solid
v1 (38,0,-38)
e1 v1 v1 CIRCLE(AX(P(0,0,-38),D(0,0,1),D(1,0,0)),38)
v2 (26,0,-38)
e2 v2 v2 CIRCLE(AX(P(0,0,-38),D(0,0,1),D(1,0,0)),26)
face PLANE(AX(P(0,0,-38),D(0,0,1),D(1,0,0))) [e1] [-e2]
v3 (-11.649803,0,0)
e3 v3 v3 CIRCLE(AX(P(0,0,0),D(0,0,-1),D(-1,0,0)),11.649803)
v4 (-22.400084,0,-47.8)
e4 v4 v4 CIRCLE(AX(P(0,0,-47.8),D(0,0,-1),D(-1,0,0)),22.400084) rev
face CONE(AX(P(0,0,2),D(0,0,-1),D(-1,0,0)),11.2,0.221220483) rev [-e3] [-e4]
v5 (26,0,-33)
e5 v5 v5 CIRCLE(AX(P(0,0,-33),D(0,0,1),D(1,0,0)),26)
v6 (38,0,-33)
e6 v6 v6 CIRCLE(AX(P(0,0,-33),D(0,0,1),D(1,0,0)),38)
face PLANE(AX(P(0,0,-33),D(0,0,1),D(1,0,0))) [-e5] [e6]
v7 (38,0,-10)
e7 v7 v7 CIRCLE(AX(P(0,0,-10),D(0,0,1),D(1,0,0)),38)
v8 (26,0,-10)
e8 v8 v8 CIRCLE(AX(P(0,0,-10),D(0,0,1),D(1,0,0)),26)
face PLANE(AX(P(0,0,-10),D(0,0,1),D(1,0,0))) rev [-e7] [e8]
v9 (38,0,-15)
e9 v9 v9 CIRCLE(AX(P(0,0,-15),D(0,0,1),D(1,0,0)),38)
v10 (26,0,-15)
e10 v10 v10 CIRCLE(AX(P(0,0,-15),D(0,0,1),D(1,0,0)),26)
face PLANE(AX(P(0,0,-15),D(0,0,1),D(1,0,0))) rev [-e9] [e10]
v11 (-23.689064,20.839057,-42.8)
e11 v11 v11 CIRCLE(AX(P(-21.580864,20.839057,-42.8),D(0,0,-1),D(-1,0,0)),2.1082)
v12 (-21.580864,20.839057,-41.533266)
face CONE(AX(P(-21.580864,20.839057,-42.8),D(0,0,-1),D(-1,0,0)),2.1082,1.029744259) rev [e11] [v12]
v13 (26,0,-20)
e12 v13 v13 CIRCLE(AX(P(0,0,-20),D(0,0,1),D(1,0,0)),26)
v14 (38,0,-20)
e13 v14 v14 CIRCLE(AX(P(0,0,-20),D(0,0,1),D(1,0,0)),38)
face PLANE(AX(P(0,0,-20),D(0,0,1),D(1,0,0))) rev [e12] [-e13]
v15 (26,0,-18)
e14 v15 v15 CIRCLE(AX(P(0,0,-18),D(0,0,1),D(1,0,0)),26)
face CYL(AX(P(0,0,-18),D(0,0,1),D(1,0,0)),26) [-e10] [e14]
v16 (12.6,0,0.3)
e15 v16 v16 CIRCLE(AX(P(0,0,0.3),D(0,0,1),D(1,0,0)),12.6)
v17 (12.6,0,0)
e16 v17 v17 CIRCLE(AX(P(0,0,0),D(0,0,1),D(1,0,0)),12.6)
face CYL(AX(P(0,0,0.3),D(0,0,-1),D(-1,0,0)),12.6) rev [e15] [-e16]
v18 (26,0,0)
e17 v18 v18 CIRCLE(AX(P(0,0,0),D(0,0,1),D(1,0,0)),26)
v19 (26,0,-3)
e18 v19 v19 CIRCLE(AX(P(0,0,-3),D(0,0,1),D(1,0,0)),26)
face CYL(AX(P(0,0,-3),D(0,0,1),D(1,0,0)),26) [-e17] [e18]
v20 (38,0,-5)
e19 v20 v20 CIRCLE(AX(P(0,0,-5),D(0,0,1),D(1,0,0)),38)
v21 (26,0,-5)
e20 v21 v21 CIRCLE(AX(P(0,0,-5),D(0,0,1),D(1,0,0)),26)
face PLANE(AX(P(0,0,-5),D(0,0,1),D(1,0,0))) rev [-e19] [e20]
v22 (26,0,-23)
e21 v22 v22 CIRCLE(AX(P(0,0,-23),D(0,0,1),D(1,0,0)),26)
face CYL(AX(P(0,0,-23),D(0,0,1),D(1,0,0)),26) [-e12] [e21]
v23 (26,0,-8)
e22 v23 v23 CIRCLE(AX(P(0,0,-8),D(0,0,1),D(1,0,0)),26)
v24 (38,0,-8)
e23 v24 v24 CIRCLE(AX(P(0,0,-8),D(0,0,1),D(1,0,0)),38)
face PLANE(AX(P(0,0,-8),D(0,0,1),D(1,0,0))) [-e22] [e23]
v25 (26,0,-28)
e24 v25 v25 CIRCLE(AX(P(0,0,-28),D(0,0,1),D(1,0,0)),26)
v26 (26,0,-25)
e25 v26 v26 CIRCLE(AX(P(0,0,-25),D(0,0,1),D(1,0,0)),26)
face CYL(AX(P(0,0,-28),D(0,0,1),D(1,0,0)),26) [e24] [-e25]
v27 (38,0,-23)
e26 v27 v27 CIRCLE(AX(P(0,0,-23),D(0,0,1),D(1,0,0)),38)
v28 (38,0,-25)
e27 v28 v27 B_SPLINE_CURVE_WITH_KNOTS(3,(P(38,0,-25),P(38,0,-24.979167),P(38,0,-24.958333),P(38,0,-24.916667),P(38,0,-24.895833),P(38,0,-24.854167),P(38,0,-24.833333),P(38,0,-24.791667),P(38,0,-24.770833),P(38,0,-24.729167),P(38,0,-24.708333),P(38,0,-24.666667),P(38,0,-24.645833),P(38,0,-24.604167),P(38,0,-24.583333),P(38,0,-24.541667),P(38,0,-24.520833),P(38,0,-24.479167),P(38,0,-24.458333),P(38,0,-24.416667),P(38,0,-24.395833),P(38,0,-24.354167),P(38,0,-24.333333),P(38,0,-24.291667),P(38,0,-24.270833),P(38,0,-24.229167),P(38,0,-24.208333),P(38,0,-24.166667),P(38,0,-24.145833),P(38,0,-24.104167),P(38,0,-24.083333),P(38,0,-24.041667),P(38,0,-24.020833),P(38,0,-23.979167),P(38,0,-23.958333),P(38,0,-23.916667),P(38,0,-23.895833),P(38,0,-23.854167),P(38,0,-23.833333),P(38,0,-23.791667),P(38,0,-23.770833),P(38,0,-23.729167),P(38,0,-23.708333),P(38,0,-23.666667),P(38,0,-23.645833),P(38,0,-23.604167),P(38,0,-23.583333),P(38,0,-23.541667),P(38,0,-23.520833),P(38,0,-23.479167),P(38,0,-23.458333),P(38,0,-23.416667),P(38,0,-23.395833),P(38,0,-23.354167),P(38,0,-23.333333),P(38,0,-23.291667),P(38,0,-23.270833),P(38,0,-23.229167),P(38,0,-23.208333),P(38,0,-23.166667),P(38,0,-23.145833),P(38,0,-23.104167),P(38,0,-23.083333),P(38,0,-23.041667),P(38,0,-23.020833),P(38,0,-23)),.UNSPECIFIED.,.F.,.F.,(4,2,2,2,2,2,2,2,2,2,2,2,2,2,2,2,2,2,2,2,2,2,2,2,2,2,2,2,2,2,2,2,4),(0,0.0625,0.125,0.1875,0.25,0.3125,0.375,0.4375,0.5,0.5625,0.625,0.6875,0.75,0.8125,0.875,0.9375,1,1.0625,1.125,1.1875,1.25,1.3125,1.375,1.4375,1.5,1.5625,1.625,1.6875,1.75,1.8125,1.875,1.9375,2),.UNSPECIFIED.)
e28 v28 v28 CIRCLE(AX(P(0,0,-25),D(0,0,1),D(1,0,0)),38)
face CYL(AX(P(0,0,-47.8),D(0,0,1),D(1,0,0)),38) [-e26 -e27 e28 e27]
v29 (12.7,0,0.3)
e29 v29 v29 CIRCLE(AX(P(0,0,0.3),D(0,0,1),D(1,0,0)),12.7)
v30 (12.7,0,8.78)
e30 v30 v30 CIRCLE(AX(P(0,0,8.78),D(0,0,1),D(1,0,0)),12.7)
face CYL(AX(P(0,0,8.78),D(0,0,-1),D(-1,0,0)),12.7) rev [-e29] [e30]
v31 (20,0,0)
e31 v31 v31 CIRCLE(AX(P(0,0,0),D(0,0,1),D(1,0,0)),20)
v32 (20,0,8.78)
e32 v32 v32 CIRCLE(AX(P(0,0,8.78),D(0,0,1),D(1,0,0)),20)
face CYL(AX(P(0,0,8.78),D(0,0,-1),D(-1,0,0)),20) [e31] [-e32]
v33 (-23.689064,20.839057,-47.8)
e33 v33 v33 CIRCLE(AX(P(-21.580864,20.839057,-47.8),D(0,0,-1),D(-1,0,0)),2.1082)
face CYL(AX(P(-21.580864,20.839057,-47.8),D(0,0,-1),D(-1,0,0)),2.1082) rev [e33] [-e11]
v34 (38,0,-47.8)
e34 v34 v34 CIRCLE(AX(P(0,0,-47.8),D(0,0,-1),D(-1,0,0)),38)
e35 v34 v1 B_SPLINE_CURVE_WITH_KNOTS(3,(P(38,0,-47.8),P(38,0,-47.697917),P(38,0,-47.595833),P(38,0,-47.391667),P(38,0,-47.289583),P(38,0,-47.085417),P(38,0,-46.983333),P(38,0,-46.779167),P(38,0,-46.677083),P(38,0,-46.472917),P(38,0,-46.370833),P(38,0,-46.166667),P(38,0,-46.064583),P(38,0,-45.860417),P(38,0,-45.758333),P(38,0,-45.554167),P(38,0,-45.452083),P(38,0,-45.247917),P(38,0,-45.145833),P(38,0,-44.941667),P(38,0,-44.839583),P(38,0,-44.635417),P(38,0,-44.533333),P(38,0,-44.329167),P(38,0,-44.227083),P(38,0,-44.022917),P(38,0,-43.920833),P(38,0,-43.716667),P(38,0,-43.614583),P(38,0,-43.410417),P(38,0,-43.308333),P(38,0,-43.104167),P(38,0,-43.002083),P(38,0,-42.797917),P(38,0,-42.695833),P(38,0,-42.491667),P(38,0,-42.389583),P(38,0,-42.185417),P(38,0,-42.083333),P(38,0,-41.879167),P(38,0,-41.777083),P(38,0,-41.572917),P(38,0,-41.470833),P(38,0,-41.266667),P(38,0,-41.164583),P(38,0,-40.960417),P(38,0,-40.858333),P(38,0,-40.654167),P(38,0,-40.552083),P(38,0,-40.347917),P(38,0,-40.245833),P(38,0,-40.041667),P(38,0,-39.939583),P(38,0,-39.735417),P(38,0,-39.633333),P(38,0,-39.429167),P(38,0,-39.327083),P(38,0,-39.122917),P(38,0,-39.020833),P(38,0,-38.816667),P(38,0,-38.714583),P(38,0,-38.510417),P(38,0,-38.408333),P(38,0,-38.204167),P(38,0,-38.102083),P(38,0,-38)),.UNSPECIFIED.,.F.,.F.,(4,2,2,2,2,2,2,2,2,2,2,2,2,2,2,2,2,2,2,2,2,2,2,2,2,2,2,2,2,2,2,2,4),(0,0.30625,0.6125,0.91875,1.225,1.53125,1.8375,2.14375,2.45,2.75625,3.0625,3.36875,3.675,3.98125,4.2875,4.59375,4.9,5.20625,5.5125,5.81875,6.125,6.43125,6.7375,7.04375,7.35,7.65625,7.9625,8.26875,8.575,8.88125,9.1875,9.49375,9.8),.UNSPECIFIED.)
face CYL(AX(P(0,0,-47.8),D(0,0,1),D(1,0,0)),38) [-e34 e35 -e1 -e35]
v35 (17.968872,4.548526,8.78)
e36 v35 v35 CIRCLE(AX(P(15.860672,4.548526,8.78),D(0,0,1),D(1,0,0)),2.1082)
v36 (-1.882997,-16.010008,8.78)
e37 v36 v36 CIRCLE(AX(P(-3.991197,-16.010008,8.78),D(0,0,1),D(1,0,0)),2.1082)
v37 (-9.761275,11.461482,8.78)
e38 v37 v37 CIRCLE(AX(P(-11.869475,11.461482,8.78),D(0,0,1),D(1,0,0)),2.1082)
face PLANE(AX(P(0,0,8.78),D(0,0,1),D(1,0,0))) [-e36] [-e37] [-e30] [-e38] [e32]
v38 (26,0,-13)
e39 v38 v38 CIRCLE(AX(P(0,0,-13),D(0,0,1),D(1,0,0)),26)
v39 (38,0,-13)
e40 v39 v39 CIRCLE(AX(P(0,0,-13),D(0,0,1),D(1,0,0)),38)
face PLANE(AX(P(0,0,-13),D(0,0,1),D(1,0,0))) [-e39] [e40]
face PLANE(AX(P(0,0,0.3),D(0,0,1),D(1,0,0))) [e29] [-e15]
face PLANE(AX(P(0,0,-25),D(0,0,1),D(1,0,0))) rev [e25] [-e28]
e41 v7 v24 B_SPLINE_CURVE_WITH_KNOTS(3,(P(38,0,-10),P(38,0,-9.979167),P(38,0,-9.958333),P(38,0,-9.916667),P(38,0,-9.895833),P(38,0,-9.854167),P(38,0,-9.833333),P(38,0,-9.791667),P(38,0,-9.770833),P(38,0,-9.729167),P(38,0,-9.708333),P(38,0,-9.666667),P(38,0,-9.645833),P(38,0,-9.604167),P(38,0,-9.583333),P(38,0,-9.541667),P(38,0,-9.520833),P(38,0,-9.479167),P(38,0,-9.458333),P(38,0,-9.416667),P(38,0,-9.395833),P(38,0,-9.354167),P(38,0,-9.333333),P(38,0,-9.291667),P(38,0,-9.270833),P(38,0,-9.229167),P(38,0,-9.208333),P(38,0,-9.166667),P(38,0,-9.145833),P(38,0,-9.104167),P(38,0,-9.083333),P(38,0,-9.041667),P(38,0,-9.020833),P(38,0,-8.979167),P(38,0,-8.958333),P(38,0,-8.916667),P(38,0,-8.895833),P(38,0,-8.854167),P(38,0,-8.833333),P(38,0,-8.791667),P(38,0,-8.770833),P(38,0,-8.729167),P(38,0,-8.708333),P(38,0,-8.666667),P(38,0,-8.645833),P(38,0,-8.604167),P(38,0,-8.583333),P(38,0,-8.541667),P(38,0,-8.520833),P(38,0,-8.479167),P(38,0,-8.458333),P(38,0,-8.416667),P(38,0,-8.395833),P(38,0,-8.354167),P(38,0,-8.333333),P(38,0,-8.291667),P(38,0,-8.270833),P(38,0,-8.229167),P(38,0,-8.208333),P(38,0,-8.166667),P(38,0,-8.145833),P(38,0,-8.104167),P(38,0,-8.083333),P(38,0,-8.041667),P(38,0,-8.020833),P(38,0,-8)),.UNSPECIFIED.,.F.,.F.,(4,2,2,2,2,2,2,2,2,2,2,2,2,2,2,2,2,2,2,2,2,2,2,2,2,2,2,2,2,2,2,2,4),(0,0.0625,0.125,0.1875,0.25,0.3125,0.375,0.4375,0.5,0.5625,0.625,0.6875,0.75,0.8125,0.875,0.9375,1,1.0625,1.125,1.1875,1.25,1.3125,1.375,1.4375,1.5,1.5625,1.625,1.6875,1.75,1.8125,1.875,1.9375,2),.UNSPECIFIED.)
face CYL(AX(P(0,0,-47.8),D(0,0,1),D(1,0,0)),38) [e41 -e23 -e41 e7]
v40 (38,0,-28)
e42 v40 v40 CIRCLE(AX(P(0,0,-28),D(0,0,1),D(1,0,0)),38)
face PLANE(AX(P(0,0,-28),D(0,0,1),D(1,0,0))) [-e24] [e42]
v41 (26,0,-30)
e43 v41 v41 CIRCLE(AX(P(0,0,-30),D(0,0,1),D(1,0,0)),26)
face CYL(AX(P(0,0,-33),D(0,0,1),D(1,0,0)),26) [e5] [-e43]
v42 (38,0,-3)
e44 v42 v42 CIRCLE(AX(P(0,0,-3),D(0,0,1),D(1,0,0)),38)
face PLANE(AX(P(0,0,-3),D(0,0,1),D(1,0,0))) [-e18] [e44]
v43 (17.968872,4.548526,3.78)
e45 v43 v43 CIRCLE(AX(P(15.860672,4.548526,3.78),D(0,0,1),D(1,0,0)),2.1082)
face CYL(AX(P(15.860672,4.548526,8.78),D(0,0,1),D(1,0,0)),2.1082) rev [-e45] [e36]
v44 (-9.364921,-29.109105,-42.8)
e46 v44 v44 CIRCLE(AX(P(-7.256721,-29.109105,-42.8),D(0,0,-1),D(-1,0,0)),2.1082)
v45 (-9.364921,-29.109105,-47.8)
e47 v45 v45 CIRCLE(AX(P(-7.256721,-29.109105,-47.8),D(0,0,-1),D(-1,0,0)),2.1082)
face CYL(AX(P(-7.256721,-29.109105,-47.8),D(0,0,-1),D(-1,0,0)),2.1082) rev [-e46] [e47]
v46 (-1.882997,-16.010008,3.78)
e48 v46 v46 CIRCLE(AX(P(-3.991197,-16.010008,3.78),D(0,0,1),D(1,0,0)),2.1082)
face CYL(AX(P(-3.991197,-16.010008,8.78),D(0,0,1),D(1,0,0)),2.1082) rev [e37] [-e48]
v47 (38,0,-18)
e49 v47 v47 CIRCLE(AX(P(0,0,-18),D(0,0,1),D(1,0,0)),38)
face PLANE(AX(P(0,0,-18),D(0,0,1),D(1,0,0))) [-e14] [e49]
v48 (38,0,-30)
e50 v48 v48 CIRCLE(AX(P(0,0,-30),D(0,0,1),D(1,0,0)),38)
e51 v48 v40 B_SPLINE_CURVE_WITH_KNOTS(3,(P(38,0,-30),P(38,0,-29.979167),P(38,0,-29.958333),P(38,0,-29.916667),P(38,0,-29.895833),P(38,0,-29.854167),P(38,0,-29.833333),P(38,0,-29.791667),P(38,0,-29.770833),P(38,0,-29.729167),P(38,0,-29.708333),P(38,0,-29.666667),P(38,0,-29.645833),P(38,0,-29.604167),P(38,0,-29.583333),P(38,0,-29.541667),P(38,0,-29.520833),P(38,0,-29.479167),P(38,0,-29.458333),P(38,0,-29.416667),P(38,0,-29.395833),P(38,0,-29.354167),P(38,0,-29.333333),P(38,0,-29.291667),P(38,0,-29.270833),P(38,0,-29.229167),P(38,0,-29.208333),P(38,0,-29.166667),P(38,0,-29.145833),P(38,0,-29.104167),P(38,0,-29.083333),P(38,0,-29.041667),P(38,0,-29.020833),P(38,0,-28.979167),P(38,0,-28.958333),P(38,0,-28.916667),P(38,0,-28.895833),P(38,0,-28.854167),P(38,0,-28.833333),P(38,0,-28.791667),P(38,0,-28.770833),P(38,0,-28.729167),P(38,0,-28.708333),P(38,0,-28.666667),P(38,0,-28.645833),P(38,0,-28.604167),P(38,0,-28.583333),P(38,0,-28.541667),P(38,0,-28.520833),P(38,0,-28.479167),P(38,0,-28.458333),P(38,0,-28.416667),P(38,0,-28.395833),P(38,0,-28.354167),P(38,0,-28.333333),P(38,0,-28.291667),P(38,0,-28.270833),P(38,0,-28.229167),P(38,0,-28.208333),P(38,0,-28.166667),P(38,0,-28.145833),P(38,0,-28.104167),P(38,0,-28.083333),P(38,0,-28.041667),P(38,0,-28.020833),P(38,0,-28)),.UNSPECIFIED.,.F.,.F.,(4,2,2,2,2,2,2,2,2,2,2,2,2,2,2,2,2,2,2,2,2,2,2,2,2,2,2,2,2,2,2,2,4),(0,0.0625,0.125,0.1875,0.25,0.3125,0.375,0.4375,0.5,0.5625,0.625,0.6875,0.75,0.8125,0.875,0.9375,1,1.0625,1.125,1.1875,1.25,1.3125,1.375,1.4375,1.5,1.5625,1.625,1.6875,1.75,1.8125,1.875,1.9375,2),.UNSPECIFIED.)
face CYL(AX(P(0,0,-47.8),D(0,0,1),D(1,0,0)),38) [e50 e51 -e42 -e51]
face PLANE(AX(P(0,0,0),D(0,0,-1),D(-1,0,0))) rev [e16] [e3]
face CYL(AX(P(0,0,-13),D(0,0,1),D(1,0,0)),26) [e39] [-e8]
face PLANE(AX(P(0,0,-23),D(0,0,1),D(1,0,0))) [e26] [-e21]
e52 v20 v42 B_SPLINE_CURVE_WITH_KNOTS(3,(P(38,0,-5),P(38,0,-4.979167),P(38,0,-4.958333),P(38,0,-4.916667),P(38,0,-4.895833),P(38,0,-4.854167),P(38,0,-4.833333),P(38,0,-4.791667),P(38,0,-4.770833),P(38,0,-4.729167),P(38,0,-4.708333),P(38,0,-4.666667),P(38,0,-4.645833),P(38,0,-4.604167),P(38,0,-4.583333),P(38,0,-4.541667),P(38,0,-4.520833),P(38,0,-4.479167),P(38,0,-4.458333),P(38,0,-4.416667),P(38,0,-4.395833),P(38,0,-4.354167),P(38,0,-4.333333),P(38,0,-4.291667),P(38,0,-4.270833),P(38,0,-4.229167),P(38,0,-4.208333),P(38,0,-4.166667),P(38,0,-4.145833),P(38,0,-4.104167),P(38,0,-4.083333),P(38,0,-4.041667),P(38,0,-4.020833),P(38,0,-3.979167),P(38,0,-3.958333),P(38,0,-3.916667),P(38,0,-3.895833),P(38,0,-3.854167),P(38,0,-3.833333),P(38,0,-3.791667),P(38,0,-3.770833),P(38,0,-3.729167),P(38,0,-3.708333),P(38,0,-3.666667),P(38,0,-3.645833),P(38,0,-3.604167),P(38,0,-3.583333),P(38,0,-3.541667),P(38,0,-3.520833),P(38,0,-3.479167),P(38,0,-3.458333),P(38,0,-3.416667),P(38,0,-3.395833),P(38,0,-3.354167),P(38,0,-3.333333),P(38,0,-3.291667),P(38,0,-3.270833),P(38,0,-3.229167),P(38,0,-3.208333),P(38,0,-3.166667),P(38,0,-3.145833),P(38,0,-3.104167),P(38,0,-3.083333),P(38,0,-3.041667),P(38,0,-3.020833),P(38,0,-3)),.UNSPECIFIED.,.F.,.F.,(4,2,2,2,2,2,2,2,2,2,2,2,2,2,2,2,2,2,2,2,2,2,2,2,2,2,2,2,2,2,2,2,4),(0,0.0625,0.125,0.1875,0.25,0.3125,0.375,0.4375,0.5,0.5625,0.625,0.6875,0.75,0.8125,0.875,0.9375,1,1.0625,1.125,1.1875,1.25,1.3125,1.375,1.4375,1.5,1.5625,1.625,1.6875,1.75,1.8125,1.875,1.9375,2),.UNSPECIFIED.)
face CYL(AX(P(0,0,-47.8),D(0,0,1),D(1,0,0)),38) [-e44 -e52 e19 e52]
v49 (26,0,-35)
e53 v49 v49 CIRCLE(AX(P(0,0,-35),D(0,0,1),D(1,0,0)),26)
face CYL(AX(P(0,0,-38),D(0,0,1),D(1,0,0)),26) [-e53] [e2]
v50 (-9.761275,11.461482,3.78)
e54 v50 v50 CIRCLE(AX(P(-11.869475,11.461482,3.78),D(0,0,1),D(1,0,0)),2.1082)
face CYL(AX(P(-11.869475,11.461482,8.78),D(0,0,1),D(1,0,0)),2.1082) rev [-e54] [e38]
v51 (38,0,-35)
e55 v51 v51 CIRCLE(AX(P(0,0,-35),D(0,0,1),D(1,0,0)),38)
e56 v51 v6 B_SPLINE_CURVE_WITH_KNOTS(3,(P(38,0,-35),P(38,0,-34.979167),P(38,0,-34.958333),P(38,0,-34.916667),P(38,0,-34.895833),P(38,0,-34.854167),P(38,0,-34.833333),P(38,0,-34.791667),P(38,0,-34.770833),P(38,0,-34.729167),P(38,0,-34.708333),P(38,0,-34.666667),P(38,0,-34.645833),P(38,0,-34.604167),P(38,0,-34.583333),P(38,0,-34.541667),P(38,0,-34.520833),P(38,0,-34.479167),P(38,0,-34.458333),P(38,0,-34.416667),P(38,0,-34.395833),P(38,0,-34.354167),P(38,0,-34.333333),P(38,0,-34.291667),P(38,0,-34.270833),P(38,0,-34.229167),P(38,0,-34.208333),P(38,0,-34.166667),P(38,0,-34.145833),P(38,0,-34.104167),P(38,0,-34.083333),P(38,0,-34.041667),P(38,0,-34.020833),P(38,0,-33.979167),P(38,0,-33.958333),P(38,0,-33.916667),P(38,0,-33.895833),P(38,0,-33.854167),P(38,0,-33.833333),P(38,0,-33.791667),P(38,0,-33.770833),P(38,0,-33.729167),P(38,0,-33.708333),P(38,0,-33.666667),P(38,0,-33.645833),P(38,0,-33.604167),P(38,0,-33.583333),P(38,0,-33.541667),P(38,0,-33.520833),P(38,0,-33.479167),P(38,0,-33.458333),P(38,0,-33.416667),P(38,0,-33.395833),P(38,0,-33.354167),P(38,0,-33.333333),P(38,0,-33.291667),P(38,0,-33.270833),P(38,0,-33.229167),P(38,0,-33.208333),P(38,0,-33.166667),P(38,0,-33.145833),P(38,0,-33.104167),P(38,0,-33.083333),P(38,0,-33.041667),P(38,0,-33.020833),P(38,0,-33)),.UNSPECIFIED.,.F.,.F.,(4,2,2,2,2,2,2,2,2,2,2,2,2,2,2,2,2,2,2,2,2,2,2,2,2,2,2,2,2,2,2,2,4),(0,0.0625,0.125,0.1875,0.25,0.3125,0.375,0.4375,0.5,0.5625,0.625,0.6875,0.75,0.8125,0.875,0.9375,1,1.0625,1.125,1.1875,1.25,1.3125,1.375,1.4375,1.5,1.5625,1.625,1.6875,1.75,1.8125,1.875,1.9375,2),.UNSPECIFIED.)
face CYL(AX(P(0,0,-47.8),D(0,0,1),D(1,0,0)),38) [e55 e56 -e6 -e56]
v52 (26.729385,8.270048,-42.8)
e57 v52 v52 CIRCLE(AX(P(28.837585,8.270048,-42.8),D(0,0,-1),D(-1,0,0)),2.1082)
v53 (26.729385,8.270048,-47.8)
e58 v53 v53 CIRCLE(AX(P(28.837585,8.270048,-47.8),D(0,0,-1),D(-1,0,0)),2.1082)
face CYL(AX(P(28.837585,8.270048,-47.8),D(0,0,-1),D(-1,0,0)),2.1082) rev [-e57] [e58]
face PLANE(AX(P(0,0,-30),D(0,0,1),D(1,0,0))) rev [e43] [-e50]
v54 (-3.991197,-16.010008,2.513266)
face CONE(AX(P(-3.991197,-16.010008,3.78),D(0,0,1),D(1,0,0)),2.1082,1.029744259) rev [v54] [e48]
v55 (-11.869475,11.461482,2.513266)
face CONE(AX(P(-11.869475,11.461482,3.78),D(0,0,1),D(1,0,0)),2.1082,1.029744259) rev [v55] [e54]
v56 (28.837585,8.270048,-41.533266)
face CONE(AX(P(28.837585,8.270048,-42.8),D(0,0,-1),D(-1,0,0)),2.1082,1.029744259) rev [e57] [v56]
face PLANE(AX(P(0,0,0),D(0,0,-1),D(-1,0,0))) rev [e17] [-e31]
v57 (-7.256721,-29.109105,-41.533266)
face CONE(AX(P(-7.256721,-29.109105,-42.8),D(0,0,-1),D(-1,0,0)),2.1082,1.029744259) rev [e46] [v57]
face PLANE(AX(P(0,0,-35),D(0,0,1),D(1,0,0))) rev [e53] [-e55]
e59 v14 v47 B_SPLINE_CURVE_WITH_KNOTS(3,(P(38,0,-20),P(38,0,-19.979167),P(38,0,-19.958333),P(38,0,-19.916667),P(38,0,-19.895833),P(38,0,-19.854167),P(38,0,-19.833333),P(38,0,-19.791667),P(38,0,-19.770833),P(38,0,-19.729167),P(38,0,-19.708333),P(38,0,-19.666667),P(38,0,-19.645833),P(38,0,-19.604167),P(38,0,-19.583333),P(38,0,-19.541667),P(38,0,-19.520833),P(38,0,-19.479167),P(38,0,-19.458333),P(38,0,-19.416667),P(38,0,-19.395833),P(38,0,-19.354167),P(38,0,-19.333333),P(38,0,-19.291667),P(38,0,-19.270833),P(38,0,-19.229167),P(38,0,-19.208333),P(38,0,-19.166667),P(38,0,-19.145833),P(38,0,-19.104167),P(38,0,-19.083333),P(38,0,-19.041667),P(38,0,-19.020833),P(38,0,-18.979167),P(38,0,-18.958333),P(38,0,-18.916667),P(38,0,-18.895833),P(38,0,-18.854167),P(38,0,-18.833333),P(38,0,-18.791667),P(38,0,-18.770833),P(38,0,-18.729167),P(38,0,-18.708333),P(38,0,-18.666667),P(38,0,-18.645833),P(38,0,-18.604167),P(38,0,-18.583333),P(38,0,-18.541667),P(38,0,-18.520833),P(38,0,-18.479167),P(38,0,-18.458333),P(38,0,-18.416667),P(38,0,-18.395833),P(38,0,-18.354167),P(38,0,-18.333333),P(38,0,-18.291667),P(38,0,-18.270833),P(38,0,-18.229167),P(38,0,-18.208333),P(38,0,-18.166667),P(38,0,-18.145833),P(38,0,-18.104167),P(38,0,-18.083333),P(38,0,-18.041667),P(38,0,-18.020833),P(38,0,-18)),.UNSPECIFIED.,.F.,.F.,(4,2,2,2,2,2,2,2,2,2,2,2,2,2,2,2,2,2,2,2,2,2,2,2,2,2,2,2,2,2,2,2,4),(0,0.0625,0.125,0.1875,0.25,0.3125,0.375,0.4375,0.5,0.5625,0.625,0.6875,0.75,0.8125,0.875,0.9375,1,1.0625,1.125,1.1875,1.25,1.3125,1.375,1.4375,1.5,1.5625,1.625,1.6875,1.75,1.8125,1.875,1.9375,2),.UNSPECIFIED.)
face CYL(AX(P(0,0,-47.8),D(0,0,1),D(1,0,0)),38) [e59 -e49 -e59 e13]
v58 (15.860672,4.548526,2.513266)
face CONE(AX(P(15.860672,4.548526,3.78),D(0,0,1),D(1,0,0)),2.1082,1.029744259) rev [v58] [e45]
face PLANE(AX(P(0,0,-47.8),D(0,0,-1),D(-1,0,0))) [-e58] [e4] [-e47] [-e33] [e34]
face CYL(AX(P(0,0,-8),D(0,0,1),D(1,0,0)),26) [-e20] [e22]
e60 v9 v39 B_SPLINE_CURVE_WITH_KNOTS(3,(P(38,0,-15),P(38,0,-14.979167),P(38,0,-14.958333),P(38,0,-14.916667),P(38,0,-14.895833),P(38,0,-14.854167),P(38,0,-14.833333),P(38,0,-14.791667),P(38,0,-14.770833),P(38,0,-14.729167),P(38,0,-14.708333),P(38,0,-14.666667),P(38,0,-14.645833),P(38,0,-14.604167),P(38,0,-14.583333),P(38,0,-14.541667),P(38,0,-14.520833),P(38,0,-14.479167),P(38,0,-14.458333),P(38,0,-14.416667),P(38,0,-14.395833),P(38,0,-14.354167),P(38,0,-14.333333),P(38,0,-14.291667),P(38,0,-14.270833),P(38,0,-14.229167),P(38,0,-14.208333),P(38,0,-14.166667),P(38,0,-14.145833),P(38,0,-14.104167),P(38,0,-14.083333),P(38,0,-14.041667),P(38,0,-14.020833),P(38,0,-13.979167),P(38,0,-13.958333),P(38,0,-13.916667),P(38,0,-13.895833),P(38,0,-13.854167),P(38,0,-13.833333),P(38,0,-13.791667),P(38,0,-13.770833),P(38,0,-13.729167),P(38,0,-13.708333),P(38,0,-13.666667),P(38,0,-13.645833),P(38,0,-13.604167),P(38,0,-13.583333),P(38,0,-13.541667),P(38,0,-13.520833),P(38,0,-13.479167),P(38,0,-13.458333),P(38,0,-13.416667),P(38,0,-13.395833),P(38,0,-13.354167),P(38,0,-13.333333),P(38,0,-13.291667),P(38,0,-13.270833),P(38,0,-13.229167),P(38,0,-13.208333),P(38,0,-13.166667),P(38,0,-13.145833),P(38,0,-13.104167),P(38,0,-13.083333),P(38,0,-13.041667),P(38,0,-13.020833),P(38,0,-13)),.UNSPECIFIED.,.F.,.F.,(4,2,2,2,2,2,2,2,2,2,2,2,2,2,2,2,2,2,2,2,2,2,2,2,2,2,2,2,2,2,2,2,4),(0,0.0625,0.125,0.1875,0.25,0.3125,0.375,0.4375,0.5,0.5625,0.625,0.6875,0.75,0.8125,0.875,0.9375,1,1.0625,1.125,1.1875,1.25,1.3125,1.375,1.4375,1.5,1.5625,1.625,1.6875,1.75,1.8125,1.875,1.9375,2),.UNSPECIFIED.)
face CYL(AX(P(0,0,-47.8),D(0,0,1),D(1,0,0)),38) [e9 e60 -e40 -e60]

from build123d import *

# Parameters (mm, degrees)
ESQUISSE1_R         = 20
ESQUISSE1_R_2       = 12.7
BOSS_EXTRU_1_DEPTH  = 8.78
ESQUISSE2_R         = 38
ESQUISSE2_R_2       = 11.2
BOSS_EXTRU_2_DEPTH  = 47.8
CHANFREIN3_SIZE     = 11.200084029
CHANFREIN3_SIZE_2   = 49.8
SKETCH7_R           = 38
SKETCH7_R_2         = 26
CUT_EXTRUDE2_DEPTH  = 3
CIRPATTERN1_COUNT   = 3
CIRPATTERN2_COUNT   = 3
SKETCH23_R          = 13.7
SKETCH23_R_2        = 12.6
BOSS_EXTRUDE1_DEPTH = 0.3
LPATTERN1_COUNT     = 8
LPATTERN1_PITCH     = 5


with BuildPart() as part:
    # Esquisse1 → Boss.-Extru.1 (new body)
    with BuildSketch(Plane.XY):
        Circle(ESQUISSE1_R)
        Circle(ESQUISSE1_R_2, mode=Mode.SUBTRACT)
    extrude(amount=BOSS_EXTRU_1_DEPTH)

    # Esquisse2 → Boss.-Extru.2 (add)
    with BuildSketch(Plane(origin=(0, 0, 0), x_dir=(-1, 0, 0), z_dir=(0, 0, -1))):
        with Locations(Location((0, 0, 0), (0, 0, 180))):
            Circle(ESQUISSE2_R)
        with Locations(Location((0, 0, 0), (0, 0, 180))):
            Circle(ESQUISSE2_R_2, mode=Mode.SUBTRACT)
    extrude(amount=BOSS_EXTRU_2_DEPTH)

    # Chanfrein3
    # the kernel refuses this chamfer: 49.8, 11.200084029 mm, written as the material it takes off along each edge
    with BuildSketch(Plane(origin=(0, 0, -47.8), x_dir=(1, 0, 0), z_dir=(0, 1, 0))) as chanfrein3_piece_1:
        Polygon((11.2 + CHANFREIN3_SIZE, 0), (11.2, -CHANFREIN3_SIZE_2), (11.2, 0), align=None)
    revolve(axis=Axis((0, 0, -47.8), (0, 0, -1)), mode=Mode.SUBTRACT)

    # Sketch7 → Cut-Extrude2 (cut)
    with BuildSketch(Plane.XY):
        Circle(SKETCH7_R)
        Circle(SKETCH7_R_2, mode=Mode.SUBTRACT)
    cut_extrude2 = extrude(amount=-CUT_EXTRUDE2_DEPTH, mode=Mode.SUBTRACT)

    # Sketch19 → Hole for #4 300® SC Nuts (SP)2 (revolve, cut)
    with BuildSketch(Plane(origin=(28.837585054, 8.270047658, -47.8), x_dir=(0, 1, 0), z_dir=(1, 0, 0))):
        Polygon((0, 0), (0, 6.266734357), (2.1082, 5), (2.1082, 0), align=None)
    hole_for_4_300_sc_nuts_sp_2 = revolve(axis=Axis((28.837585054, 8.270047658, -54.15), (0, 0, 1)), mode=Mode.SUBTRACT)

    # CirPattern1: Hole for #4 300® SC Nuts (SP)2 ×3 about axis
    cirpattern1_axis = Axis((0, 0, 0), (0, 0, 1))
    for i in range(1, CIRPATTERN1_COUNT):
        add(hole_for_4_300_sc_nuts_sp_2.rotate(cirpattern1_axis, i * 360 / CIRPATTERN1_COUNT), mode=Mode.SUBTRACT)

    # Sketch22 → Hole for #4 300® SC Nuts (SP)3 (revolve, cut)
    with BuildSketch(Plane(origin=(15.86067178, 4.548526212, 8.78), x_dir=(0, -1, 0), z_dir=(1, 0, 0))):
        Polygon((0, 0), (0, 6.266734357), (2.1082, 5), (2.1082, 0), align=None)
    hole_for_4_300_sc_nuts_sp_3 = revolve(axis=Axis((15.86067178, 4.548526212, 15.13), (0, 0, -1)), mode=Mode.SUBTRACT)

    # CirPattern2: Hole for #4 300® SC Nuts (SP)3 ×3 about axis
    cirpattern2_axis = Axis((0, 0, 0), (0, 0, 1))
    for i in range(1, CIRPATTERN2_COUNT):
        add(hole_for_4_300_sc_nuts_sp_3.rotate(cirpattern2_axis, i * 360 / CIRPATTERN2_COUNT), mode=Mode.SUBTRACT)

    # Sketch23 → Boss-Extrude1 (add)
    with BuildSketch(Plane.XY):
        Circle(SKETCH23_R)
        Circle(SKETCH23_R_2, mode=Mode.SUBTRACT)
    extrude(amount=BOSS_EXTRUDE1_DEPTH)

    # LPattern1: Cut-Extrude2 ×8
    with Locations(*[(0, 0, -i * LPATTERN1_PITCH) for i in range(1, LPATTERN1_COUNT)]):
        add(cut_extrude2, mode=Mode.SUBTRACT)


solid = part.part
